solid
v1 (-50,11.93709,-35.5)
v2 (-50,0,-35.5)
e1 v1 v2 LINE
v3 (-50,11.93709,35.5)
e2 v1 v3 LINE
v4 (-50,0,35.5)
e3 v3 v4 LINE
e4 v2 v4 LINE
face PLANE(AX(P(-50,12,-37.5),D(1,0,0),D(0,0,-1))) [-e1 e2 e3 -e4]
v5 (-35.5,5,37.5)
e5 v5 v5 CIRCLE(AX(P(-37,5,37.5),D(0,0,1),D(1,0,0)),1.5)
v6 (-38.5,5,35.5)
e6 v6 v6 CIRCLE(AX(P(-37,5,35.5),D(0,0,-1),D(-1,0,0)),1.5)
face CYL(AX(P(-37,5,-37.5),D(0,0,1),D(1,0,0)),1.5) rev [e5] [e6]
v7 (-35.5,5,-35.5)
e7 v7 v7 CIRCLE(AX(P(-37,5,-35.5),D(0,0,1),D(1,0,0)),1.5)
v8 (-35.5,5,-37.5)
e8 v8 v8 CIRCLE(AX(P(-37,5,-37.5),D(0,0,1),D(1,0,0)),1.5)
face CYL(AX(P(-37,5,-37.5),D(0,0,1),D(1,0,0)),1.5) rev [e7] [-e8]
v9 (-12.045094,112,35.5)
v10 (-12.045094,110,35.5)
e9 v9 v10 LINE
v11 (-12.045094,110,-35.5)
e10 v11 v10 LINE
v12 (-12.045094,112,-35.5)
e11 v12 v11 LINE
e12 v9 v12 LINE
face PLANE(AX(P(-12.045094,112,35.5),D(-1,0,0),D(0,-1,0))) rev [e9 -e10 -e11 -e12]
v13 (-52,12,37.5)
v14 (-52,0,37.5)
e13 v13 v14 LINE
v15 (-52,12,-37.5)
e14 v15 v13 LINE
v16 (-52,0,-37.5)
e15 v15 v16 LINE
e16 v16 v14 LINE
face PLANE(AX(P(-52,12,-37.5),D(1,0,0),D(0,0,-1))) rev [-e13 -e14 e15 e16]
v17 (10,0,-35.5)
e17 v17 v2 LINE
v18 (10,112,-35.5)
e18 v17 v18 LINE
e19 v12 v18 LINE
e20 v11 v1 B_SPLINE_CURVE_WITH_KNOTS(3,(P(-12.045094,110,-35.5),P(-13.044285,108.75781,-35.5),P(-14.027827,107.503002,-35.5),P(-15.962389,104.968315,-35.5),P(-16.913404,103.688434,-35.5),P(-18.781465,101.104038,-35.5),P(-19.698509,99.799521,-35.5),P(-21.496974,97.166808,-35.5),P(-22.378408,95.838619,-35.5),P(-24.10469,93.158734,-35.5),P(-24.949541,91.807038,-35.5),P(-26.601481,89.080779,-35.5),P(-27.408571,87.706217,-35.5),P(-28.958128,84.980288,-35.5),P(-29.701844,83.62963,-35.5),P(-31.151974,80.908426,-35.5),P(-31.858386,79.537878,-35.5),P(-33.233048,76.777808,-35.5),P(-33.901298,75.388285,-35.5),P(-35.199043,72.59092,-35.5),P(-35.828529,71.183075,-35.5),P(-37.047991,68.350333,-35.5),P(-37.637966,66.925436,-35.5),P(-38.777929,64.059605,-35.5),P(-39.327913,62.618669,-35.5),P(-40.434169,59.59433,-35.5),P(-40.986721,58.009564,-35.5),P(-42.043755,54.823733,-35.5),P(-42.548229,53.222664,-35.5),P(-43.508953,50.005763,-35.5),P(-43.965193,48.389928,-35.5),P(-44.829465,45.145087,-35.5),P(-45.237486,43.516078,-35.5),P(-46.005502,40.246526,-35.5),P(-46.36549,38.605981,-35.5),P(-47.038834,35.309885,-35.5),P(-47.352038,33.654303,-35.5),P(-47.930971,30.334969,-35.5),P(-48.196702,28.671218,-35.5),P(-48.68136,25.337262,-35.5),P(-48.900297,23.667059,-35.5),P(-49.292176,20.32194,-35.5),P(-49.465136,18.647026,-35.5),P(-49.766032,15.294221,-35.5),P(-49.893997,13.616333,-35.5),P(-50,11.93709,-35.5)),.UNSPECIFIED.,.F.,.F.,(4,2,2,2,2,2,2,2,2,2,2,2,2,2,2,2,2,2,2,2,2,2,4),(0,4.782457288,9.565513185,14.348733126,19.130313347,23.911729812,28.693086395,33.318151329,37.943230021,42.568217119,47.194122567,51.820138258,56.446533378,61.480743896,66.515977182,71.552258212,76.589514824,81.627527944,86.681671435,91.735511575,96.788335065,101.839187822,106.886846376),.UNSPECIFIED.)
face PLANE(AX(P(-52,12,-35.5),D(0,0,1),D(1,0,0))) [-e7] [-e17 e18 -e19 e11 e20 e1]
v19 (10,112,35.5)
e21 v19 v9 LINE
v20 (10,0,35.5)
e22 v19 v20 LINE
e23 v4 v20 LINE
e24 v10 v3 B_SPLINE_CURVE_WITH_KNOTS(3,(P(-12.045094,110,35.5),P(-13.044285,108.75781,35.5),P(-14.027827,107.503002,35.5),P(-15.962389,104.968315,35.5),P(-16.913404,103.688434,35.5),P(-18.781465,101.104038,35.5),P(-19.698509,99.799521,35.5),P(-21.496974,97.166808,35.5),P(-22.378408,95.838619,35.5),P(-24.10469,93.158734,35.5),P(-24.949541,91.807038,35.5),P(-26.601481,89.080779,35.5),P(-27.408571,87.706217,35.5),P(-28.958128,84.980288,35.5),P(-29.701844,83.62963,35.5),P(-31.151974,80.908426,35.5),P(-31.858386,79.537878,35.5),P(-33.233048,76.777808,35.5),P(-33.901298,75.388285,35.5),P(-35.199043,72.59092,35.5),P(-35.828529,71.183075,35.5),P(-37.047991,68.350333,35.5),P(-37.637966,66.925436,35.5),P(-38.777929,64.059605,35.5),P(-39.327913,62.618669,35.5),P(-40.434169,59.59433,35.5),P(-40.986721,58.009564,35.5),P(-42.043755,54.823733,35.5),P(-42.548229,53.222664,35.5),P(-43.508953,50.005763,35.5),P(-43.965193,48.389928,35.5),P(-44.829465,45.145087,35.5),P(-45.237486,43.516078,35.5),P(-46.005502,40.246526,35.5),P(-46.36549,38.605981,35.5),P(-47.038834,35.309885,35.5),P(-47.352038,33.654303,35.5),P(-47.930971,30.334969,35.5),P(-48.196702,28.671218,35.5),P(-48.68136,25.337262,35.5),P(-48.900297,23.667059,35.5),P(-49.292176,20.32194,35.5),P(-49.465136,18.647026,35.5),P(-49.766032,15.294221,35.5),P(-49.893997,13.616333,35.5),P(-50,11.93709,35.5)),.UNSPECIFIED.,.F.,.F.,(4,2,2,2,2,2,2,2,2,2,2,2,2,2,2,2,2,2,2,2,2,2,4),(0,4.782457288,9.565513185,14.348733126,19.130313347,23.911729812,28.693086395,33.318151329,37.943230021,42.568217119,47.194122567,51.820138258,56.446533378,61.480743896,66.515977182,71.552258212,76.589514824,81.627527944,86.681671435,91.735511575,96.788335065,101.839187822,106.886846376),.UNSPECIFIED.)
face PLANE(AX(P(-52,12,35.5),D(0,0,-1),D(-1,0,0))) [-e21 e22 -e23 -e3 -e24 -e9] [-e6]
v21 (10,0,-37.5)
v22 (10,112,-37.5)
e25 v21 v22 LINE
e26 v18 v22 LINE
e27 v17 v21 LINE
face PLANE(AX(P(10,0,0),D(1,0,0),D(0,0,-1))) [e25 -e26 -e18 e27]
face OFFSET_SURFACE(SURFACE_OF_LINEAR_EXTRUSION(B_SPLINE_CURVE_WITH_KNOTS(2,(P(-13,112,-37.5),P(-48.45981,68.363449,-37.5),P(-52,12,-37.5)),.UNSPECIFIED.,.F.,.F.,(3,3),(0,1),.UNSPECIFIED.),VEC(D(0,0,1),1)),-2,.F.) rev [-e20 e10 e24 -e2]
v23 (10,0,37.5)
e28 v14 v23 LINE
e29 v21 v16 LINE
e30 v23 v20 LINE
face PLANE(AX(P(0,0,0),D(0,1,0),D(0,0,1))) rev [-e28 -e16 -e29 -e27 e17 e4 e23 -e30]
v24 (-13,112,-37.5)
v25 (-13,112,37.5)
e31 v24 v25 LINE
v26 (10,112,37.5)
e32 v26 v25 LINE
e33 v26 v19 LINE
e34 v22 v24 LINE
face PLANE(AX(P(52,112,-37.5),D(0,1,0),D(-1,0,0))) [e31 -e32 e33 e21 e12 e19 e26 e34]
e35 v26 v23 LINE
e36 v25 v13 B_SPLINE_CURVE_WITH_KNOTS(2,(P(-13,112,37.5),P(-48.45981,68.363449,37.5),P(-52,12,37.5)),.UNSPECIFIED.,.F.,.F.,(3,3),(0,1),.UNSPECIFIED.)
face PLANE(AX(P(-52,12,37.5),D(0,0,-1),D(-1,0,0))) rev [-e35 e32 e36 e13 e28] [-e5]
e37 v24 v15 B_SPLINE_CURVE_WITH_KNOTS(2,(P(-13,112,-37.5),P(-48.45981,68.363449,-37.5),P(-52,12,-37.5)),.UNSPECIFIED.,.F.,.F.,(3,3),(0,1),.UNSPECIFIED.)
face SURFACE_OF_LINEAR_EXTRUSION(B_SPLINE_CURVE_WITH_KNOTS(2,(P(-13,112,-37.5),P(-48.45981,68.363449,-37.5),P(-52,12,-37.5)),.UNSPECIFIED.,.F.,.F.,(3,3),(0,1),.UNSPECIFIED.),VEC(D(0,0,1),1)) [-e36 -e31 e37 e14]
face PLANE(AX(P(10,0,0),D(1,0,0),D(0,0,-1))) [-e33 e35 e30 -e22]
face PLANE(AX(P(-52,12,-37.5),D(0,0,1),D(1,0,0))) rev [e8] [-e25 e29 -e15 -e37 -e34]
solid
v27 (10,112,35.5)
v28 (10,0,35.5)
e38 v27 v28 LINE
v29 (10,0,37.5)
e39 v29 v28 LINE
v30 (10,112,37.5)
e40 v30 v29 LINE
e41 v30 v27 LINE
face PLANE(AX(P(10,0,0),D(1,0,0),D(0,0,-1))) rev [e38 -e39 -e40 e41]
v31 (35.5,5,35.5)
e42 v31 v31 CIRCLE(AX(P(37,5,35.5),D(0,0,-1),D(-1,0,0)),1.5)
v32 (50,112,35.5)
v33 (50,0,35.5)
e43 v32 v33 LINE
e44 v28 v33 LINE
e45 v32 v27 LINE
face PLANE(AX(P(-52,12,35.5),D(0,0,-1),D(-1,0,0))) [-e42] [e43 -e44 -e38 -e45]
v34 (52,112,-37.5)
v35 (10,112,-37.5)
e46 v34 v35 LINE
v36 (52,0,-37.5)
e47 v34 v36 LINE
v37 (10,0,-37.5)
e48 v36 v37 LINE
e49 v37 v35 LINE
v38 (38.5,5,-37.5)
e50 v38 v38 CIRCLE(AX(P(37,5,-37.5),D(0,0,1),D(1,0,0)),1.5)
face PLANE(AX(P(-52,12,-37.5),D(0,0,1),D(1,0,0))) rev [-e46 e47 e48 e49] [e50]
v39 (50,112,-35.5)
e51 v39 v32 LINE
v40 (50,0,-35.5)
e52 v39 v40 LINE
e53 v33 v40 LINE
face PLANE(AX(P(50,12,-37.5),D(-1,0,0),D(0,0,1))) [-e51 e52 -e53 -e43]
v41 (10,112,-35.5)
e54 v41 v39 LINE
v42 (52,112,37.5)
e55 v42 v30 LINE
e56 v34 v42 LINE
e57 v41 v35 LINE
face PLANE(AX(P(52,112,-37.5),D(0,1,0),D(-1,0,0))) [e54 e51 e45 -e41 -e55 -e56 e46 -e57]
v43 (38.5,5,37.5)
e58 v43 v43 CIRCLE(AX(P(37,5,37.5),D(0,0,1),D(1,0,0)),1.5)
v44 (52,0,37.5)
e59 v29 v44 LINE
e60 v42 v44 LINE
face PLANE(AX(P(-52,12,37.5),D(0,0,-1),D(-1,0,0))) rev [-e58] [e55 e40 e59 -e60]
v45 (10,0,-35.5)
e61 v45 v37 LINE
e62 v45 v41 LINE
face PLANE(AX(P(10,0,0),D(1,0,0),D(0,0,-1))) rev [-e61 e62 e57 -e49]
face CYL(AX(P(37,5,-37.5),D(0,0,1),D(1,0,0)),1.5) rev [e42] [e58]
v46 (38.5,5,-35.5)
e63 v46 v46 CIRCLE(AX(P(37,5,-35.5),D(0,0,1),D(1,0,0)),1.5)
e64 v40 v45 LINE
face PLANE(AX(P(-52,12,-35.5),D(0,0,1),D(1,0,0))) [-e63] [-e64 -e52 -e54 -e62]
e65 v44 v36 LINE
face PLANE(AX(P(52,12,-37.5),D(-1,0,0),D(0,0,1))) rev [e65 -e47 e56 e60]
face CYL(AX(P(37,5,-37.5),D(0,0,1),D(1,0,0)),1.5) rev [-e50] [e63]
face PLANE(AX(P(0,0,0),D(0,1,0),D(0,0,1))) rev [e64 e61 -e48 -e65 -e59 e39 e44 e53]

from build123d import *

# Parameters (mm, degrees)
SKETCH1_W           = 104
SKETCH1_H           = 75
BOSS_EXTRUDE2_DEPTH = 12
BOSS_EXTRUDE4_DEPTH = 75
SHELL1_START        = -35.5
SHELL1_DEPTH        = 71
SKETCH3_W           = 62.04509354
SKETCH3_H           = 71
CUT_EXTRUDE1_DEPTH  = 128.319480206
SKETCH4_R           = 1.5
CUT_EXTRUDE2_DEPTH  = 145.474911482


# Read off the part's stored shape, not the designer's step: Shell1
with BuildPart() as part:
    # Sketch1 → Boss-Extrude2 (new body)
    with BuildSketch(Plane(origin=(0, 0, 0), x_dir=(1, 0, 0), z_dir=(0, 1, 0))):
        Rectangle(SKETCH1_W, SKETCH1_H)
    extrude(amount=BOSS_EXTRUDE2_DEPTH)

    # Sketch2 → Boss-Extrude4 (add)
    with BuildSketch(Plane.XY.offset(37.5)):
        with BuildLine():
            Line((52, 12), (52, 112))
            Line((52, 112), (-13, 112))
            add(Edge.make_bspline(
                [(-13, 112), (-48.459809771, 68.363449042), (-52, 12)],
                knots=[0, 0, 0, 1, 1, 1], degree=2))
            Line((-52, 12), (52, 12))
        make_face()
    extrude(amount=-BOSS_EXTRUDE4_DEPTH)

    # Shell1 outline → Shell1 (cut)
    with BuildSketch(Plane.XY.offset(SHELL1_START)):
        with BuildLine():
            Line((50, 110), (-12.045093537, 110.000000006))
            add(Edge.make_bspline(
                [(-12.045093537, 110.000000006), (-20.670956306, 99.276173698), (-28.182222953, 88.11932571), (-34.582341912, 76.528575232), (-39.874973944, 64.50158541), (-44.063442169, 52.033775923), (-47.148080274, 39.119568406), (-49.127608799, 25.754940937), (-50, 11.937090173)],
                knots=[0.008542591, 0.008542591, 0.008542591, 0.008542591, 0.008542591, 0.008542591, 0.008542591, 0.008542591, 0.008542591, 0.999440121, 0.999440121, 0.999440121, 0.999440121, 0.999440121, 0.999440121, 0.999440121, 0.999440121, 0.999440121], degree=8))
            Line((-50, 11.937090173), (-50, 0))
            Line((-50, 0), (50, 0))
            Line((50, 0), (50, 110))
        make_face()
    extrude(amount=SHELL1_DEPTH, mode=Mode.SUBTRACT)

    # Sketch3 → Cut-Extrude1 (cut, through all)
    with BuildSketch(Plane.XZ.offset(-110)):
        with Locations((18.97745323, 0)):
            Rectangle(SKETCH3_W, SKETCH3_H)
    extrude(amount=-CUT_EXTRUDE1_DEPTH, mode=Mode.SUBTRACT)

    # Sketch4 → Cut-Extrude2 (cut, through all)
    with BuildSketch(Plane.XY.offset(37.5)):
        with Locations((-37, 5)):
            Circle(SKETCH4_R)
        with Locations((37, 5)):
            Circle(SKETCH4_R)
    extrude(amount=-CUT_EXTRUDE2_DEPTH, mode=Mode.SUBTRACT)


with BuildPart() as body_2:
    # Split1: the piece on the far side of the plane
    add(part.part)
    split(bisect_by=Plane(origin=(10, 0, 0), x_dir=(0, 0, 1), z_dir=(1, 0, 0)), keep=Keep.BOTTOM)


with BuildPart() as part_1:
    add(part.part)

    # Split1
    split(bisect_by=Plane(origin=(10, 0, 0), x_dir=(0, 0, 1), z_dir=(1, 0, 0)), keep=Keep.TOP)


solid = Compound([body_2.part, part_1.part])
